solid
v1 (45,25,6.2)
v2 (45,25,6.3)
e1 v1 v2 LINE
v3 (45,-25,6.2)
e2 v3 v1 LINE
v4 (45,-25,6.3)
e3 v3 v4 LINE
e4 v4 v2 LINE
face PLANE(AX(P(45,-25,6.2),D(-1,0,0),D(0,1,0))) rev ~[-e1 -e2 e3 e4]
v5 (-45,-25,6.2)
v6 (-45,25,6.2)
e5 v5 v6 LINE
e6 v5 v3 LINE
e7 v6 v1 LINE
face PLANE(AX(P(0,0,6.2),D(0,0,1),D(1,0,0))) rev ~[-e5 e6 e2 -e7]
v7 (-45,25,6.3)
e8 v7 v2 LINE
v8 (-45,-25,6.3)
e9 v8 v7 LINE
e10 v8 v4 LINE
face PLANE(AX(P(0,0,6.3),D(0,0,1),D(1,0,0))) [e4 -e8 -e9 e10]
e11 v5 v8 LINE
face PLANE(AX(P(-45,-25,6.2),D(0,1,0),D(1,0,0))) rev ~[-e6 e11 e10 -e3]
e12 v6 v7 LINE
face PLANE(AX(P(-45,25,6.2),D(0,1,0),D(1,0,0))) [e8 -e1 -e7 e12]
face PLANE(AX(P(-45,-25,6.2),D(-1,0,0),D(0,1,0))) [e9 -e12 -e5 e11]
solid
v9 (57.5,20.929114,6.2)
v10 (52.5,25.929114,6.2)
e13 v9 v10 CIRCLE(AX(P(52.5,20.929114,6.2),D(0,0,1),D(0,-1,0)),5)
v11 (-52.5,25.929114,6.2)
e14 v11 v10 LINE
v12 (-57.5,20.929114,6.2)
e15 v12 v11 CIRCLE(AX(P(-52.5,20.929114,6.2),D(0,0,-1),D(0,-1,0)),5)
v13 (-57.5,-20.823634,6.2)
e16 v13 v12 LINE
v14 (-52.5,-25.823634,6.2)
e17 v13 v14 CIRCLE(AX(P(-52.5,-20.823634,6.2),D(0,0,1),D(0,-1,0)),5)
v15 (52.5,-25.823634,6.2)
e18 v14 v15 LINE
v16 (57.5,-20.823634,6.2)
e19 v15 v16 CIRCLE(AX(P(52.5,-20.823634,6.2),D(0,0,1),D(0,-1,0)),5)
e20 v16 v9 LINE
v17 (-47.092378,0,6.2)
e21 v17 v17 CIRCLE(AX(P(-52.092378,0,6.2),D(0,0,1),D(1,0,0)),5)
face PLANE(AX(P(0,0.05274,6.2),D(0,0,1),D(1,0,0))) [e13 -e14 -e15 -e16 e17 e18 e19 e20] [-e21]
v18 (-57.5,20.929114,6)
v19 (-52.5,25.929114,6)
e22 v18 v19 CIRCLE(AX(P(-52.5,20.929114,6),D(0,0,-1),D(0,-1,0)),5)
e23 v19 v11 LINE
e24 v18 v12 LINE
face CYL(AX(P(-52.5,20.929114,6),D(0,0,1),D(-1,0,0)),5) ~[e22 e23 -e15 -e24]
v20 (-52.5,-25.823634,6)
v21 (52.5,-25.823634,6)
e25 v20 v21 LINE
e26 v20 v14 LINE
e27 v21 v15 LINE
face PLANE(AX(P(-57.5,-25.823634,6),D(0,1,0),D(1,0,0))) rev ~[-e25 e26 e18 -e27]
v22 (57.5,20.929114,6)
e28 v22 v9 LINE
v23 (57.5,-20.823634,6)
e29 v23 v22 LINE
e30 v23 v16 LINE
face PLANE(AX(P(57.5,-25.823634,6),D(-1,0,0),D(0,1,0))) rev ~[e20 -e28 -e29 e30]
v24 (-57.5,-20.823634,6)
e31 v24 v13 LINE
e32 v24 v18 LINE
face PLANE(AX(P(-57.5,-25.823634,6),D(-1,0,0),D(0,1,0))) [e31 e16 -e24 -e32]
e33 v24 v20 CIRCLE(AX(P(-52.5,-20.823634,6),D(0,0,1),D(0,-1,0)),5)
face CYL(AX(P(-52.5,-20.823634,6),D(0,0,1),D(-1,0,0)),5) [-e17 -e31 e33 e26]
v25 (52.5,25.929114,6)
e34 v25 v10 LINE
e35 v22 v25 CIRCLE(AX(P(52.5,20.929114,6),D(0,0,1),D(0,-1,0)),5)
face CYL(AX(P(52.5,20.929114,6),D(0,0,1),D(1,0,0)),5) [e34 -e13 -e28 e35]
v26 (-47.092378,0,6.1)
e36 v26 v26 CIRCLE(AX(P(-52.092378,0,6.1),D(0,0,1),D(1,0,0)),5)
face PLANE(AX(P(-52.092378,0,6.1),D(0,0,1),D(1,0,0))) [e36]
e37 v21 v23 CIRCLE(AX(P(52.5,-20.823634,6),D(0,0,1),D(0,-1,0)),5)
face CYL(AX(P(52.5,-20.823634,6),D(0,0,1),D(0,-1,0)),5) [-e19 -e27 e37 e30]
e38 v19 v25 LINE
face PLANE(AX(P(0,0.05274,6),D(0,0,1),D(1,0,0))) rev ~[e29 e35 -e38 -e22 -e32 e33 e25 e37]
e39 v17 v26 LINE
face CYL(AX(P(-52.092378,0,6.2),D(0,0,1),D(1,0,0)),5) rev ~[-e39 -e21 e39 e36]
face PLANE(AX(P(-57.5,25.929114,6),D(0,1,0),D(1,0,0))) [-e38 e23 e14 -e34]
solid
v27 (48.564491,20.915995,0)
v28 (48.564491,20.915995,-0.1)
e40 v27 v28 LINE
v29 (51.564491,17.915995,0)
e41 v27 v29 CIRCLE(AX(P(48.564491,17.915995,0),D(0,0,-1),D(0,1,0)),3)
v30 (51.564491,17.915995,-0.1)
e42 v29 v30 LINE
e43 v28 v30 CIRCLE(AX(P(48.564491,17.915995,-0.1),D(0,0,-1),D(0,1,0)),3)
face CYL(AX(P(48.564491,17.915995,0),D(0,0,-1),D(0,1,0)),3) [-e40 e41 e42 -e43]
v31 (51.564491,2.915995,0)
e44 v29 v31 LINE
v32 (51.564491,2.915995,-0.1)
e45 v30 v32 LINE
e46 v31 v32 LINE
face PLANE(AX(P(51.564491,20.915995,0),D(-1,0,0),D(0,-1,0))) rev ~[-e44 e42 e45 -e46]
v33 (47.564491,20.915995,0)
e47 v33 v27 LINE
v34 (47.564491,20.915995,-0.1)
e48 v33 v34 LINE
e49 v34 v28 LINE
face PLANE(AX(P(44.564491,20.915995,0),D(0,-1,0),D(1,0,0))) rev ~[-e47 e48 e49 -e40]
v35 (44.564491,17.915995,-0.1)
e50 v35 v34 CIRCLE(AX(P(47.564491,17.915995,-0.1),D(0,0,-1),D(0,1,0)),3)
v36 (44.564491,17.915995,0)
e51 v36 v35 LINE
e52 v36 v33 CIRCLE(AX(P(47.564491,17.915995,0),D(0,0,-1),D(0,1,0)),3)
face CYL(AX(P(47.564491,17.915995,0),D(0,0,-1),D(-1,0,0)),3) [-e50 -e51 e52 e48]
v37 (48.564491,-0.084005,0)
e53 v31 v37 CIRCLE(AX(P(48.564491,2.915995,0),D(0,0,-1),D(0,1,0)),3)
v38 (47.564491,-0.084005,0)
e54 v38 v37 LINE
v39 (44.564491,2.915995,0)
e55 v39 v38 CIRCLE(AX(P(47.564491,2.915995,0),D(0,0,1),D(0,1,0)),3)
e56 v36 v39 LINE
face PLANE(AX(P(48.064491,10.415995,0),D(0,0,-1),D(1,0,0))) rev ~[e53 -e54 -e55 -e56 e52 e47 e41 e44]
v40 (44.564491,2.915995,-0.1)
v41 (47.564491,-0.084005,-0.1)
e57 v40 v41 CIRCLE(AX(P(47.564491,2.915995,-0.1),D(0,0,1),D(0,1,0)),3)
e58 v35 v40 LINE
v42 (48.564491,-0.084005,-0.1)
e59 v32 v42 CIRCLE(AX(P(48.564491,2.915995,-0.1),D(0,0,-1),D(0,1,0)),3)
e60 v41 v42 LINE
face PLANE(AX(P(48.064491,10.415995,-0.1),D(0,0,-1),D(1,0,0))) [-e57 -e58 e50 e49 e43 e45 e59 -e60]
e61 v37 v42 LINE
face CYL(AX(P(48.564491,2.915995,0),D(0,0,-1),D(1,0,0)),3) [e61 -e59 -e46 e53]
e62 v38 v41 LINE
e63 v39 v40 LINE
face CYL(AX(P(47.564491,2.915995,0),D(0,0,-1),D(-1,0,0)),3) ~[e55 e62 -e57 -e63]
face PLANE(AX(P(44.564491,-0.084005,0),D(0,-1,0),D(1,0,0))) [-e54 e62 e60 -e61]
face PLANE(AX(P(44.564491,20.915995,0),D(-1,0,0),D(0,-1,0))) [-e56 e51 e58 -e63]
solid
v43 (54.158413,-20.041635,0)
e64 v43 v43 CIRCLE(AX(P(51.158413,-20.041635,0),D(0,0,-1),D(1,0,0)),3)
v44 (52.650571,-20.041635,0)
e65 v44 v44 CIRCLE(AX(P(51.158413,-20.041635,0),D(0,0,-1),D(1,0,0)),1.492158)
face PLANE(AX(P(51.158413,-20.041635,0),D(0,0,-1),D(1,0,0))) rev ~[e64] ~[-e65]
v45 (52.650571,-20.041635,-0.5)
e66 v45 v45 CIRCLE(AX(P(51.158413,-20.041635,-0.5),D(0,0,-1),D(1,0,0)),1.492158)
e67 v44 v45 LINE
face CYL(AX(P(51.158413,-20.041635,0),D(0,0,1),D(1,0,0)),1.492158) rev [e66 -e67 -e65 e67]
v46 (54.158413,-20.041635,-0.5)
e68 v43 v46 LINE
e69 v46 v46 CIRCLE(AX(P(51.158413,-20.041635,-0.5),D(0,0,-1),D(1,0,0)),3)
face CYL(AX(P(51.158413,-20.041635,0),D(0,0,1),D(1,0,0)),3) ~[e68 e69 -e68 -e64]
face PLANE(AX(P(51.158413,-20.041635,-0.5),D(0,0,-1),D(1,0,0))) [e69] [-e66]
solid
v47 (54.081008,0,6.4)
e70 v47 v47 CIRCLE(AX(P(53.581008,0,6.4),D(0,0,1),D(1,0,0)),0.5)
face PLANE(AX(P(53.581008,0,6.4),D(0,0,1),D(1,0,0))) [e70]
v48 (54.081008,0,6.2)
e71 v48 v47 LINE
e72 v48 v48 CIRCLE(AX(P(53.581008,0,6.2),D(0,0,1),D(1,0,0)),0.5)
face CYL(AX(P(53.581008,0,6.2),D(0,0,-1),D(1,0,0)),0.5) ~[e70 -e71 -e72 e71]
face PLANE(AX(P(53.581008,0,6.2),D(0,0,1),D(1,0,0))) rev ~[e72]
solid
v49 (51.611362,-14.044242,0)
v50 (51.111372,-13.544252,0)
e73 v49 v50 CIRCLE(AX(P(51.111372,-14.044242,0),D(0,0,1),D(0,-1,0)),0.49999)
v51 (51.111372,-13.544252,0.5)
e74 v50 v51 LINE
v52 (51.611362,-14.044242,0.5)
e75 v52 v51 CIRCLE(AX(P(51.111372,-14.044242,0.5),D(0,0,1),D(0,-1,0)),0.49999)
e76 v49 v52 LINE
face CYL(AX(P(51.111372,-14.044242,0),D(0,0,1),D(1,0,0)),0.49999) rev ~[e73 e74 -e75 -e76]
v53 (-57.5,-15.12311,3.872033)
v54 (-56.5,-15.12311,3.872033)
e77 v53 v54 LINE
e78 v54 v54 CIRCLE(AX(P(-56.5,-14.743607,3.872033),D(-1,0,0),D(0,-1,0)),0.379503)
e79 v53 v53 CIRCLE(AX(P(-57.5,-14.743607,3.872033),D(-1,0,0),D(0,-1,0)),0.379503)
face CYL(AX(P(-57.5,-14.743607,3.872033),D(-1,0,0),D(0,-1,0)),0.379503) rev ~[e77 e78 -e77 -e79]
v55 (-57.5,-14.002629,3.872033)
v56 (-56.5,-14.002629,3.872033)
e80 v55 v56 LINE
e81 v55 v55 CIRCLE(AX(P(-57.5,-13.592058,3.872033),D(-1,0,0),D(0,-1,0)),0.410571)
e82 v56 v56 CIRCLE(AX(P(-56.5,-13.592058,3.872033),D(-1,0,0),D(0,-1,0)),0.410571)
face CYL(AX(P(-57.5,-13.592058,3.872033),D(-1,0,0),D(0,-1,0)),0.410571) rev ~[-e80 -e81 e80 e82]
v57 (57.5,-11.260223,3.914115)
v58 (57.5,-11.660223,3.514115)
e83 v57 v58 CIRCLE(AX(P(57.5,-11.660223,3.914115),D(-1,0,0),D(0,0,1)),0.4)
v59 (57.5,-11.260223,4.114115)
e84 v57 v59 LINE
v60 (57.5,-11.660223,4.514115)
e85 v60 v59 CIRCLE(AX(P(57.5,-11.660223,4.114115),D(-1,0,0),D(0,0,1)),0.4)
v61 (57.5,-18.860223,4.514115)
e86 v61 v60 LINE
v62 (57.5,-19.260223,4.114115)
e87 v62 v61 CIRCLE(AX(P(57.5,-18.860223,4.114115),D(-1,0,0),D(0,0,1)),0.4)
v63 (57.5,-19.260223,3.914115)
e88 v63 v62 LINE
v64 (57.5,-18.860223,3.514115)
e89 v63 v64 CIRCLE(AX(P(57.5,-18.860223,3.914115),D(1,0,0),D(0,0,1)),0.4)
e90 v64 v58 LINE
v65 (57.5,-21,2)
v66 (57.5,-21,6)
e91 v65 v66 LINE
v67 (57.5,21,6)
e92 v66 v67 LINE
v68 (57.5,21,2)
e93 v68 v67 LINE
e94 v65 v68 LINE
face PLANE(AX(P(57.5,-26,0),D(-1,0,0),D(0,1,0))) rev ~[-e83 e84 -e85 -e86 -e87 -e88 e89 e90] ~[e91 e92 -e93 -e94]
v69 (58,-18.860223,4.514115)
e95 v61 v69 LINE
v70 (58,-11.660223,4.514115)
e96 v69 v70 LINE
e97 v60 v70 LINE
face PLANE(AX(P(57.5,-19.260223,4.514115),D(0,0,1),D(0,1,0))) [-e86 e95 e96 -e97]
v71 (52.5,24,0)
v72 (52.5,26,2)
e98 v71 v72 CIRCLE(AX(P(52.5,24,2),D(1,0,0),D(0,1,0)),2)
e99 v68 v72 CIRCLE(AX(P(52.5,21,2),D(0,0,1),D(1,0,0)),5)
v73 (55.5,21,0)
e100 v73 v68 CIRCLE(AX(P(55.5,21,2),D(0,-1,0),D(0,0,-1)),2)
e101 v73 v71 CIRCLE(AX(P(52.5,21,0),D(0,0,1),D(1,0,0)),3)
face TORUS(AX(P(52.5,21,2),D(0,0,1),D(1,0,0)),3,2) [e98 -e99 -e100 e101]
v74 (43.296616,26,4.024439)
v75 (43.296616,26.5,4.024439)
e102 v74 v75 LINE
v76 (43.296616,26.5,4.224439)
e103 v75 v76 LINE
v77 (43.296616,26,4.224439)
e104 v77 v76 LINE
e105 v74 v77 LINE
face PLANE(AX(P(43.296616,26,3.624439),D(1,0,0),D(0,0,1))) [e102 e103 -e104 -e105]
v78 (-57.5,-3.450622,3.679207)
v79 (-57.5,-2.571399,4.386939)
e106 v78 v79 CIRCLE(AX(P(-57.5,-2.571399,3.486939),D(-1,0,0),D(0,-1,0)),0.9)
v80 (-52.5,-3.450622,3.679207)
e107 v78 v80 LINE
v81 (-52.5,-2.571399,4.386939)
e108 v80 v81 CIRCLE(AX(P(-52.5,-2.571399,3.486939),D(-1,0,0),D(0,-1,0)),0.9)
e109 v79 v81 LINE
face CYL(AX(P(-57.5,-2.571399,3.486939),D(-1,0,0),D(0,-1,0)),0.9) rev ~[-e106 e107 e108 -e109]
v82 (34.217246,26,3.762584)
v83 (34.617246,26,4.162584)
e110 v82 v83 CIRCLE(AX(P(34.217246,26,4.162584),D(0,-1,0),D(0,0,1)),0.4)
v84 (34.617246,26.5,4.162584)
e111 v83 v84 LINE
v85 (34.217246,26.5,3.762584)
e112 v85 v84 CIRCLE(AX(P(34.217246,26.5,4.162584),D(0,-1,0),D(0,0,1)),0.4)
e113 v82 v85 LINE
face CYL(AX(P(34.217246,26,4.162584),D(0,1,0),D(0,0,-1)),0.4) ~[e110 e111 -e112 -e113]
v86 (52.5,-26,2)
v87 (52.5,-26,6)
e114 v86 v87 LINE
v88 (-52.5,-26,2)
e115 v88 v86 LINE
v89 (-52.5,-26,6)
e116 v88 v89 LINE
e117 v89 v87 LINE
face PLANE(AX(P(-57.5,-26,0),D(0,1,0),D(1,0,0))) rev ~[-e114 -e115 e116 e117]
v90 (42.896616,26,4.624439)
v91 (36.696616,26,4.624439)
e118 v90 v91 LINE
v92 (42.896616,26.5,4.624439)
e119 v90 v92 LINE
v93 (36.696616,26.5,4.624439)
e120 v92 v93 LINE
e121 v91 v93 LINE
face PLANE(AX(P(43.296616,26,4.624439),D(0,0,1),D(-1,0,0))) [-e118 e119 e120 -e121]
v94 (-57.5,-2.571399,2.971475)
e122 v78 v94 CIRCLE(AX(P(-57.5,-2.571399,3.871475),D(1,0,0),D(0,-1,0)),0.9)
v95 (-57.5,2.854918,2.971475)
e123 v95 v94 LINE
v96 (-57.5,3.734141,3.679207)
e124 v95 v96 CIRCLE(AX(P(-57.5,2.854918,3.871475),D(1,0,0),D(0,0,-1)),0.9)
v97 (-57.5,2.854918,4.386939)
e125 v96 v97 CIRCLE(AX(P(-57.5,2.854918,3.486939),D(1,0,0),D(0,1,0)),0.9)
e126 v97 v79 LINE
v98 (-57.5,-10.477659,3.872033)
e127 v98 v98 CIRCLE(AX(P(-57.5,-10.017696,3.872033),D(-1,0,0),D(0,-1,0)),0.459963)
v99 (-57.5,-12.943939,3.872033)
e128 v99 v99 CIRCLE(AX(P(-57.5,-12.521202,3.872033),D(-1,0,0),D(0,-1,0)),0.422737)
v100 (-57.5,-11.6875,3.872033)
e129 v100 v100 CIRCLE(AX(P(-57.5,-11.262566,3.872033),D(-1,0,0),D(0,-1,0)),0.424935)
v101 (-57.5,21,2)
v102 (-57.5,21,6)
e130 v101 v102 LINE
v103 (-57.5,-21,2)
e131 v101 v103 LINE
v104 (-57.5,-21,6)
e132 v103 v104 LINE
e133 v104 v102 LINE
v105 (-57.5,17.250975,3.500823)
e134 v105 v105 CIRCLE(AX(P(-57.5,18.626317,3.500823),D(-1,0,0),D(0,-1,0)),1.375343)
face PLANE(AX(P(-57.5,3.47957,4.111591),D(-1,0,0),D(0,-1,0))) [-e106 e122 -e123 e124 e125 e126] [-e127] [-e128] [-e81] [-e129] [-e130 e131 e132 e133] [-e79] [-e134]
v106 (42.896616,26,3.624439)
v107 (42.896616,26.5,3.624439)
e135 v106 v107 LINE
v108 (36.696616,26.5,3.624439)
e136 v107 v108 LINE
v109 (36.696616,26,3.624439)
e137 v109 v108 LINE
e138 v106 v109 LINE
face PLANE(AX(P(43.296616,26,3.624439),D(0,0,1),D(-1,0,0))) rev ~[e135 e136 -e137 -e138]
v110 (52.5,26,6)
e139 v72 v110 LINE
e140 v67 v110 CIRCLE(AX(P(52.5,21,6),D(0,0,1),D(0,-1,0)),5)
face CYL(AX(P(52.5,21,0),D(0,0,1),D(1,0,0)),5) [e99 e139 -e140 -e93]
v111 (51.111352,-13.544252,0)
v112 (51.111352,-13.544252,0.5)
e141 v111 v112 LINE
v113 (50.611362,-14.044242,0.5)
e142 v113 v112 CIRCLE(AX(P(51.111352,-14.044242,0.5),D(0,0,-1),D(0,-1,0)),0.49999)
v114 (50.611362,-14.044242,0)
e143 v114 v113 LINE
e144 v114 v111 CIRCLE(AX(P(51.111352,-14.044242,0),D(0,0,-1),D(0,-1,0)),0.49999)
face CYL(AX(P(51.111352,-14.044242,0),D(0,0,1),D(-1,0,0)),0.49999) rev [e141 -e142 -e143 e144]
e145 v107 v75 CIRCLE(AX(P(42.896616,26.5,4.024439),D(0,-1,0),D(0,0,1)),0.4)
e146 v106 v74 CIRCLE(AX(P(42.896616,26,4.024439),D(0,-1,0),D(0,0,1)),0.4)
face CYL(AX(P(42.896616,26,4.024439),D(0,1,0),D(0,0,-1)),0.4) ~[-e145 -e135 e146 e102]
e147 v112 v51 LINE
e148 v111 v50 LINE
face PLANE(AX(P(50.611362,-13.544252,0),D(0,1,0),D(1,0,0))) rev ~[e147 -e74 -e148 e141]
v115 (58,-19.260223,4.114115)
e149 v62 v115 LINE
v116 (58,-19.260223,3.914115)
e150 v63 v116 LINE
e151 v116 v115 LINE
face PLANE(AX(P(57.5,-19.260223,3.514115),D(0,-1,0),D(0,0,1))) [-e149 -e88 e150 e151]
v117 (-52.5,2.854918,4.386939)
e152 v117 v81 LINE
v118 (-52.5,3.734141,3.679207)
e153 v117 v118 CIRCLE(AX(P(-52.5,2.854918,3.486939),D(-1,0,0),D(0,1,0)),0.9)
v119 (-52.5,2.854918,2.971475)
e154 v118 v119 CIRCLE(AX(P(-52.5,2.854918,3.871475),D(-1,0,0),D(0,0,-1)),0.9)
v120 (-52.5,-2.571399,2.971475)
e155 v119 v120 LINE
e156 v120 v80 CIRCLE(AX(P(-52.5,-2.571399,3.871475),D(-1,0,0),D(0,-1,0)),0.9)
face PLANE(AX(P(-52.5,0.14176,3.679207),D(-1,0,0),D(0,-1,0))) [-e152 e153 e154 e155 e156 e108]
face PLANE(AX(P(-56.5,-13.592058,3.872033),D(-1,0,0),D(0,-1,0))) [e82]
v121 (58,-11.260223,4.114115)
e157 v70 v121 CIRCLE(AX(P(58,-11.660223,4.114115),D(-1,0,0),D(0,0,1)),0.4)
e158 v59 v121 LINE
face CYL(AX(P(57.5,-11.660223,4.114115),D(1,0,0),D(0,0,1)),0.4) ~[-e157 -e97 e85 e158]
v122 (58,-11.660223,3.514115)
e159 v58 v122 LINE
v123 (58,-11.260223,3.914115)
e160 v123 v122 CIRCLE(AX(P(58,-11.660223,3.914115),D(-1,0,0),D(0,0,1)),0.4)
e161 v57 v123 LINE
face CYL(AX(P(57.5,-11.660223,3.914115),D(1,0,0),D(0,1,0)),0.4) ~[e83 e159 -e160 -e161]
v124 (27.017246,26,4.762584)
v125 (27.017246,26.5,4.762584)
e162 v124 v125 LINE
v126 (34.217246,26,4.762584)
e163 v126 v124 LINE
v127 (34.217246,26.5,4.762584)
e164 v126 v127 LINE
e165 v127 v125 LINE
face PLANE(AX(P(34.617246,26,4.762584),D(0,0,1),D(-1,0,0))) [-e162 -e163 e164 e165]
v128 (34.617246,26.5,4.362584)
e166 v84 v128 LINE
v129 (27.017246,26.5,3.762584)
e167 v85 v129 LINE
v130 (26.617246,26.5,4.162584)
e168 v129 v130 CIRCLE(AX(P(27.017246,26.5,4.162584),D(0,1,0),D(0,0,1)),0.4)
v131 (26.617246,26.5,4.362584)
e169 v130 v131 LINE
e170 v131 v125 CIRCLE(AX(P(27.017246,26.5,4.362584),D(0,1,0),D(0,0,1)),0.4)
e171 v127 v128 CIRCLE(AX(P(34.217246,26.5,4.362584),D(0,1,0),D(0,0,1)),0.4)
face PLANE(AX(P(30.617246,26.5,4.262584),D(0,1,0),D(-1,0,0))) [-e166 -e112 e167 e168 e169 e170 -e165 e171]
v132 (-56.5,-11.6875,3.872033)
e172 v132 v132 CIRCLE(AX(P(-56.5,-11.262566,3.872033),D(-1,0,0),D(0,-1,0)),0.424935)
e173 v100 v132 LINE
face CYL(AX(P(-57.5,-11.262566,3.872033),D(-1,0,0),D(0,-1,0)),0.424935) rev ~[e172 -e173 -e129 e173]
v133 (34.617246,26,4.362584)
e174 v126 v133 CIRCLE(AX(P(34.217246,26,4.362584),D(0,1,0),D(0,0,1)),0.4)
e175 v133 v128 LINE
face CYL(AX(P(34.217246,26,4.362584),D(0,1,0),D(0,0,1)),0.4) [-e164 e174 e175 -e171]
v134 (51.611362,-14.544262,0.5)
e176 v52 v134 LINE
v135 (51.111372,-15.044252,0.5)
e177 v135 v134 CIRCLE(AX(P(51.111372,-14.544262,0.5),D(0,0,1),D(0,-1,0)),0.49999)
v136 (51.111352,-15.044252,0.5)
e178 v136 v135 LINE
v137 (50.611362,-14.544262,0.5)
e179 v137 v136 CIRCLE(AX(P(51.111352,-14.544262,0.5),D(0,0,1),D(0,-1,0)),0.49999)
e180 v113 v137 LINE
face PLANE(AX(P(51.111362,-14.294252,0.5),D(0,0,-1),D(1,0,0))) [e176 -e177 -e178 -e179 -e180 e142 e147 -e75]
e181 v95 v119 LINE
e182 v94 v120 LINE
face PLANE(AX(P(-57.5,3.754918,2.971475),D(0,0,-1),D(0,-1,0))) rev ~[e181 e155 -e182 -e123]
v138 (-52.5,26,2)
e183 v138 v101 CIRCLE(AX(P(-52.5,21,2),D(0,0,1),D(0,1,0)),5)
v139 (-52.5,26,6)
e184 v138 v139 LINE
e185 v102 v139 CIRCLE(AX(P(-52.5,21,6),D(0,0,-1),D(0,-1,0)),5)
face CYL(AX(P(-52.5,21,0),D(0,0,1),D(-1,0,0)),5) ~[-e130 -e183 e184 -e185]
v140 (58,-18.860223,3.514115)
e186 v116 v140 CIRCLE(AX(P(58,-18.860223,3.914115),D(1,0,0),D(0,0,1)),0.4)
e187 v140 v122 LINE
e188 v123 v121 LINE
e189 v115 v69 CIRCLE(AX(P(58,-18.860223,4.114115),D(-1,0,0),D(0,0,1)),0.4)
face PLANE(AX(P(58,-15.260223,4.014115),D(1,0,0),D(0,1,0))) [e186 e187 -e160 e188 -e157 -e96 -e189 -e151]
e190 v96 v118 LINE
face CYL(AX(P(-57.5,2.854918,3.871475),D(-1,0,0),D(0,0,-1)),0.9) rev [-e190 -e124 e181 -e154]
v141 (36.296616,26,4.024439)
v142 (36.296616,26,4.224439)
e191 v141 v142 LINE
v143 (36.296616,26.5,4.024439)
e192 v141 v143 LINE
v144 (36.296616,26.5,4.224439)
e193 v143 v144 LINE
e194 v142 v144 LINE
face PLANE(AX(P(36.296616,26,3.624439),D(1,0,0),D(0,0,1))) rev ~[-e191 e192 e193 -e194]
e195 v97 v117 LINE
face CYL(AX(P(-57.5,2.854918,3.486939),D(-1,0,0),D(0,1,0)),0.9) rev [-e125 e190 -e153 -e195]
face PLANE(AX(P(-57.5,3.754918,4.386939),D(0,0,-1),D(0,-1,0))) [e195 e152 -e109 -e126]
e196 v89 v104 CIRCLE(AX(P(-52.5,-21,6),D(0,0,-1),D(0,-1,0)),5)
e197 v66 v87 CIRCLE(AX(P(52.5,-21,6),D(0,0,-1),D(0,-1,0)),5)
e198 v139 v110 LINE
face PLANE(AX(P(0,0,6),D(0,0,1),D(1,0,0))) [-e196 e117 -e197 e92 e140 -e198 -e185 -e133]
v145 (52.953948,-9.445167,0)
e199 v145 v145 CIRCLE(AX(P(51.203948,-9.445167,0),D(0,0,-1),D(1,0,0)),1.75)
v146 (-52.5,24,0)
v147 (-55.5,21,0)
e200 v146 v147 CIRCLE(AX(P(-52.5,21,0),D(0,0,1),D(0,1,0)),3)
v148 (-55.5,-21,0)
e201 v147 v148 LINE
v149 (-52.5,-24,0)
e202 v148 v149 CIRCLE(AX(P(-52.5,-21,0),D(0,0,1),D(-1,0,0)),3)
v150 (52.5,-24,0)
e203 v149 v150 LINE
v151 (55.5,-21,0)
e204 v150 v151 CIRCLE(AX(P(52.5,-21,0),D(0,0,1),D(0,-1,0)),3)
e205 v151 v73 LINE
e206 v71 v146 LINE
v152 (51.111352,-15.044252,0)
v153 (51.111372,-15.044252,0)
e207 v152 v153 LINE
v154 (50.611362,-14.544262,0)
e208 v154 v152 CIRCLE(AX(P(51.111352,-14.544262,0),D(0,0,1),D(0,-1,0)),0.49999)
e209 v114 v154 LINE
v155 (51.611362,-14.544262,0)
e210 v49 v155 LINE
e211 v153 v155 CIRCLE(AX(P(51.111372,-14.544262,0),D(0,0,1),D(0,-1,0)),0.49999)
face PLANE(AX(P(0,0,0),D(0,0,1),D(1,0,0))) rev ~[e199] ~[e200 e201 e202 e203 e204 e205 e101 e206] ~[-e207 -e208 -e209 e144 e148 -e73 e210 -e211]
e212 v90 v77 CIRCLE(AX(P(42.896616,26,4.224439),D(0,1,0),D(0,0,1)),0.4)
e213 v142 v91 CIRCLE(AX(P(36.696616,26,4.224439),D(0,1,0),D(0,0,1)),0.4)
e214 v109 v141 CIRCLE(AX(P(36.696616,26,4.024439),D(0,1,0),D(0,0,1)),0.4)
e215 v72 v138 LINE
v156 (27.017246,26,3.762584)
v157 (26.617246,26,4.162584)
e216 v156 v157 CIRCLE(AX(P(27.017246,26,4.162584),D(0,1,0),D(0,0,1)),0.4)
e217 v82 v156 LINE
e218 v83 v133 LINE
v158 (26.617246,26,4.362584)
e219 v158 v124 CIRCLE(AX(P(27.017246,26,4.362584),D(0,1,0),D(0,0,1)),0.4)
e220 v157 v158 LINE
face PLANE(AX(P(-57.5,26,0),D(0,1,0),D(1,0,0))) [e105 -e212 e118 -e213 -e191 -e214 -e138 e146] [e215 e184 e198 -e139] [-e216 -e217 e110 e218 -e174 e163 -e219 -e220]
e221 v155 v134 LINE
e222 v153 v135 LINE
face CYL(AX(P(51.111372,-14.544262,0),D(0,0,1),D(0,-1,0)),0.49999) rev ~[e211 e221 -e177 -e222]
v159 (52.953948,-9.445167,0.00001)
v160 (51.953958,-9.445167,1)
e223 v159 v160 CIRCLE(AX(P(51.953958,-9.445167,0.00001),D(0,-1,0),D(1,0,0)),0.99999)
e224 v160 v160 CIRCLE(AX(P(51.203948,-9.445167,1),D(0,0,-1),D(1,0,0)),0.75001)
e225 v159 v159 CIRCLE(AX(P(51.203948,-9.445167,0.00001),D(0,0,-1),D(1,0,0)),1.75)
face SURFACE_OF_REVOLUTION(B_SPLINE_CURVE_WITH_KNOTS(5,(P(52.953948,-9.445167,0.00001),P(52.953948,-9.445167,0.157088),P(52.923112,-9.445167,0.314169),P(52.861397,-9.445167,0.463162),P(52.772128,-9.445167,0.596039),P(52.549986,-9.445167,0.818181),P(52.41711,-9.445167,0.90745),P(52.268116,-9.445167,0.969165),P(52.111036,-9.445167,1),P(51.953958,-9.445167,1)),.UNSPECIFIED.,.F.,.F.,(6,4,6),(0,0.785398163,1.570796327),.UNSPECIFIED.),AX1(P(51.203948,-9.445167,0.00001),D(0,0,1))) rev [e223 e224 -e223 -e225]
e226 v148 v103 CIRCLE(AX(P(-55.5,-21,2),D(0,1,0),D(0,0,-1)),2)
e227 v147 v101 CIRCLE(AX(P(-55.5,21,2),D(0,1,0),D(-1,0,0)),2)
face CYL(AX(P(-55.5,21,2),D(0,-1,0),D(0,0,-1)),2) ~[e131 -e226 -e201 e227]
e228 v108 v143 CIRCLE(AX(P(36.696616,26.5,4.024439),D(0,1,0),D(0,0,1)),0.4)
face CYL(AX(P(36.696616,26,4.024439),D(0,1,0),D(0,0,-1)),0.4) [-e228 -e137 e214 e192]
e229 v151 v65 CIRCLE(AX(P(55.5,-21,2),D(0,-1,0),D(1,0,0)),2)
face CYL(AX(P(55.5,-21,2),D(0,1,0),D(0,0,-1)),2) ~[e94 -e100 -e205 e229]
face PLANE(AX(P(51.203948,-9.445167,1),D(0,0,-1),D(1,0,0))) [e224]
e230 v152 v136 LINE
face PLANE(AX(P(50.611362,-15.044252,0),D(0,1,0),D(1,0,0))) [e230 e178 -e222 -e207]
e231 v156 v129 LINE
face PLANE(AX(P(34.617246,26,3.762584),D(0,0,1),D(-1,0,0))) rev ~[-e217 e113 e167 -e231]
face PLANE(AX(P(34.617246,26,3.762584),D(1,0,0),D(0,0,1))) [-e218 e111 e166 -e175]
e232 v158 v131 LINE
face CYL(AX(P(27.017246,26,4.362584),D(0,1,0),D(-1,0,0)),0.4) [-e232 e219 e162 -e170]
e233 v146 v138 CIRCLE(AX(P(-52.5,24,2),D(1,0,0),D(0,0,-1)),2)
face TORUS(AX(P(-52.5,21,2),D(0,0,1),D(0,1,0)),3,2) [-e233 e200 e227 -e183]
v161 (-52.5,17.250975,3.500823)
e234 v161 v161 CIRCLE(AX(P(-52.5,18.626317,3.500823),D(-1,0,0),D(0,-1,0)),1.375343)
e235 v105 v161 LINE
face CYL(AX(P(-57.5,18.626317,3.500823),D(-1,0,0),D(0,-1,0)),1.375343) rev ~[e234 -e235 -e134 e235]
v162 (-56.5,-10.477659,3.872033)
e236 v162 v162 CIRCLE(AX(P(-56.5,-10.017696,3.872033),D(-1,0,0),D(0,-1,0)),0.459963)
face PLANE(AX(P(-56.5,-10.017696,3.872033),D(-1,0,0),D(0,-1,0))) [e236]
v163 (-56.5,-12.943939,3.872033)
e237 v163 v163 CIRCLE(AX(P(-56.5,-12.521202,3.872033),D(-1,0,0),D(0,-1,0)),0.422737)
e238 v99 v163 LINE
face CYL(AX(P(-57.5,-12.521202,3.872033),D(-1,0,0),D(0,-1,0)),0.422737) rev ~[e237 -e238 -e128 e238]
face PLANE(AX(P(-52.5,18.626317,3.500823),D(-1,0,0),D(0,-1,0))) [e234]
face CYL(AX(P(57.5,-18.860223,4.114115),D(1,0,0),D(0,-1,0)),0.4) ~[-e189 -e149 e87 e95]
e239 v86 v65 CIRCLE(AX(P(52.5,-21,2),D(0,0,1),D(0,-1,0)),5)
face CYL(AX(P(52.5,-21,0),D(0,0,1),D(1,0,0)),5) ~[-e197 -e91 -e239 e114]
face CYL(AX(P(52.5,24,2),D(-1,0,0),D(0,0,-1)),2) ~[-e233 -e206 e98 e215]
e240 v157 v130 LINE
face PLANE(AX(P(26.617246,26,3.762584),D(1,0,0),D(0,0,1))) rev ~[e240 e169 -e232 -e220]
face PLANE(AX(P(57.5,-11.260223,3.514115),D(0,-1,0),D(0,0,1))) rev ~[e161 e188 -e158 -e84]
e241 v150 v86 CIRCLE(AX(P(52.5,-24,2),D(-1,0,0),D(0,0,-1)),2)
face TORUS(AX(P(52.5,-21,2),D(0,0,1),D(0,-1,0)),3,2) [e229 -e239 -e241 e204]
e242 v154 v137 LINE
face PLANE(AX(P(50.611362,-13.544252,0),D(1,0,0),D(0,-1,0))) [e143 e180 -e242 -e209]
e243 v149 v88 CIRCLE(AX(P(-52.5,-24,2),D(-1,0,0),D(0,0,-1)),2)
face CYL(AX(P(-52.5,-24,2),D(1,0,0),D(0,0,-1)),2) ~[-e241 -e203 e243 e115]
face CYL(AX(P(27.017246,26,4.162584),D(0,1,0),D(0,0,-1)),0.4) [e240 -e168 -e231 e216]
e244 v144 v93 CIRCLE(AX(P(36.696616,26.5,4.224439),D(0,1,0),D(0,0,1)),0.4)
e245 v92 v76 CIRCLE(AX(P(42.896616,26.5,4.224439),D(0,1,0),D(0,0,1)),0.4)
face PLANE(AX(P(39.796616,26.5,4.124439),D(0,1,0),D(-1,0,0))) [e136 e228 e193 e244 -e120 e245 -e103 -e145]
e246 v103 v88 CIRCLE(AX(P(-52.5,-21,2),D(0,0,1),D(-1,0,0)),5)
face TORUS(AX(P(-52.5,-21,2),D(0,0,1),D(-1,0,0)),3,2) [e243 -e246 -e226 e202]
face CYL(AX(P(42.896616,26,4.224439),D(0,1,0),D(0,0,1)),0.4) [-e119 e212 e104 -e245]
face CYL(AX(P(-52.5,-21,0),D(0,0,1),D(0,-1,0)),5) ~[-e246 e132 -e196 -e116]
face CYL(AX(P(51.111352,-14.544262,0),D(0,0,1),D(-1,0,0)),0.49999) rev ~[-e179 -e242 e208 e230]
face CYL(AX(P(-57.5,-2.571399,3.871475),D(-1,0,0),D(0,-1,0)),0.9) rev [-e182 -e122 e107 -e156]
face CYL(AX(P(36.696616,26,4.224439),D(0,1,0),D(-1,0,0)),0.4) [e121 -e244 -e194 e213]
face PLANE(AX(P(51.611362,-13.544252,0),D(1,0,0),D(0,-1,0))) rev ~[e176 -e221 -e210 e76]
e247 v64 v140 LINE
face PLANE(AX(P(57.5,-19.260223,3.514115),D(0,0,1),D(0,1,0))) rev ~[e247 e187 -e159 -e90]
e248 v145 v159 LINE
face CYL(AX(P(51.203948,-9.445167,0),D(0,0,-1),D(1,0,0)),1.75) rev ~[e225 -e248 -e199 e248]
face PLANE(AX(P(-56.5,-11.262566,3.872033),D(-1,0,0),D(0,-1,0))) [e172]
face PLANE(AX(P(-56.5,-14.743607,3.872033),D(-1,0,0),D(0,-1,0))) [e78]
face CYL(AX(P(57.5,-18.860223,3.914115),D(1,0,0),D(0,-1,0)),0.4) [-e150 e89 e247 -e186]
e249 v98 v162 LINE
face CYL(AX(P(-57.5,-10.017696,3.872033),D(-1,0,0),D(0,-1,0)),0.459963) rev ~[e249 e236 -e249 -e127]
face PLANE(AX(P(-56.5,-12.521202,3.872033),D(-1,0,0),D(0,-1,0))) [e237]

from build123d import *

# Parameters (mm, degrees)
F0_W         = 115
F0_H         = 52
F1_DEPTH     = 6
F2_R         = 5
F3_R         = 5
F4_R         = 5
F5_R         = 5
F6_R         = 2
F7_W         = 7
F7_H         = 1
F8_DEPTH     = 0.5
F9_R         = 0.4
F10_W        = 8
F10_H        = 1
F11_DEPTH    = 0.5
F12_R        = 0.4
F13_R        = 1.3753427914
F14_DEPTH    = 5
F15_W        = 7.2263174225
F15_H        = 1.4154640958
F16_DEPTH    = 5
F17_T1_DEPTH = 7.25
F18_R        = 0.4599630822
F18_R_2      = 0.4249345938
F18_R_3      = 0.4227374369
F18_R_4      = 0.410570945
F18_R_5      = 0.3795025996
F19_DEPTH    = 1
F20_W        = 8
F20_H        = 1
F21_DEPTH    = 0.5
F22_R        = 0.4
F23_R        = 3
F23_R_2      = 1.4921578392
F24_DEPTH    = 0.5
F25_W        = 1
F25_H        = 1.5
F26_DEPTH    = 0.5
F27_R        = 0.49999
F28_R        = 1.75
F29_DEPTH    = 1
F30_R        = 0.99999
F31_W        = 7
F31_H        = 21
F32_DEPTH    = 0.1
F33_R        = 3
F34_W        = 115
F34_H        = 51.7527479678
F35_DEPTH    = 0.2
F36_R        = 5
F38_R        = 0.5
F39_DEPTH    = 0.2
F40_W        = 90
F40_H        = 50
F41_DEPTH    = 0.1
F42_R        = 5
F43_DEPTH    = 0.1


# Not quite as in the source:
# - a fillet or chamfer that OpenCascade refuses, or shapes differently, is made with other operations: its cross-section is extruded or revolved along the edge and cut away or added
# - a fillet or chamfer is up to 0.001 mm smaller than in the source, because OpenCascade refuses the exact size


with BuildPart() as f1:
    # F0 (on Top) → F1 (new body)
    with BuildSketch(Plane.XY):
        Rectangle(F0_W, F0_H)
    extrude(amount=F1_DEPTH)

    # F2
    f2_edges = [f1.edges().sort_by_distance(p)[0] for p in [
        (57.5, 26, 3),
    ]]
    fillet(f2_edges, radius=F2_R)

    # F3
    f3_edges = [f1.edges().sort_by_distance(p)[0] for p in [
        (57.5, -26, 3),
    ]]
    fillet(f3_edges, radius=F3_R)

    # F4
    f4_edges = [f1.edges().sort_by_distance(p)[0] for p in [
        (-57.5, -26, 3),
    ]]
    fillet(f4_edges, radius=F4_R)

    # F5
    f5_edges = [f1.edges().sort_by_distance(p)[0] for p in [
        (-57.5, 26, 3),
    ]]
    fillet(f5_edges, radius=F5_R)

    # F6
    f6_edges = [f1.edges().sort_by_distance(p)[0] for p in [
        (0, -26, 0),
    ]]
    fillet(f6_edges, radius=F6_R)

    # F7 (on face) → F8 (join)
    with BuildSketch(Plane(origin=(0, 26, 0), x_dir=(-1, 0, 0), z_dir=(0, 1, 0))):
        with Locations((-39.7966161668, 4.1244386885)):
            Rectangle(F7_W, F7_H)
    extrude(amount=F8_DEPTH)

    # F9
    f9_edges = [f1.edges().sort_by_distance(p)[0] for p in [
        (43.296616, 26.25, 4.624439),
        (43.296616, 26.25, 3.624439),
        (36.296616, 26.25, 3.624439),
        (36.296616, 26.25, 4.624439),
    ]]
    fillet(f9_edges, radius=F9_R)

    # F10 (on face) → F11 (join)
    with BuildSketch(Plane(origin=(0, 26, 0), x_dir=(-1, 0, 0), z_dir=(0, 1, 0))):
        with Locations((-30.6172464043, 4.2625843126)):
            Rectangle(F10_W, F10_H)
    extrude(amount=F11_DEPTH)

    # F12
    f12_edges = [f1.edges().sort_by_distance(p)[0] for p in [
        (34.617246, 26.25, 4.762584),
        (34.617246, 26.25, 3.762584),
        (26.617246, 26.25, 3.762584),
        (26.617246, 26.25, 4.762584),
    ]]
    fillet(f12_edges, radius=F12_R)

    # F13 (on face) → F14 (cut)
    with BuildSketch(Plane(origin=(-57.5, 0, 0), x_dir=(0, -1, 0), z_dir=(-1, 0, 0))):
        with Locations((-18.6263173819, 3.5008231644)):
            Circle(F13_R)
    extrude(amount=-F14_DEPTH, mode=Mode.SUBTRACT)

    # F15 (on face) → F16 (cut)
    with BuildSketch(Plane(origin=(-57.5, 0, 0), x_dir=(0, -1, 0), z_dir=(-1, 0, 0))):
        with Locations((-0.1417595195, 3.6792070605)):
            Rectangle(F15_W, F15_H)
    extrude(amount=-F16_DEPTH, mode=Mode.SUBTRACT)

    # F17: fillet of radius 0.9 on 4 edges, made by hand

    # F17_s2 → F17_t1 (join)
    with BuildSketch(Plane.YZ.offset(-57.5)):
        with BuildLine():
            ThreePointArc((3.7549182307, 3.4869391084), (3.4913143338, 4.1233352114), (2.8549182307, 4.3869391084))
            Line((2.8549182307, 4.3869391084), (3.7549182307, 4.3869391084))
            Line((3.7549182307, 4.3869391084), (3.7549182307, 3.4869391084))
        make_face()
        with BuildLine():
            ThreePointArc((2.8549182307, 2.9714750126), (3.4913143338, 3.2350789095), (3.7549182307, 3.8714750126))
            Line((3.7549182307, 3.8714750126), (3.7549182307, 2.9714750126))
            Line((3.7549182307, 2.9714750126), (2.8549182307, 2.9714750126))
        make_face()
        with BuildLine():
            ThreePointArc((-3.4713991918, 3.4869391084), (-3.2077952948, 4.1233352114), (-2.5713991918, 4.3869391084))
            Line((-2.5713991918, 4.3869391084), (-3.4713991918, 4.3869391084))
            Line((-3.4713991918, 4.3869391084), (-3.4713991918, 3.4869391084))
        make_face()
        with BuildLine():
            ThreePointArc((-3.4713991918, 3.8714750126), (-3.2077952948, 3.2350789095), (-2.5713991918, 2.9714750126))
            Line((-2.5713991918, 2.9714750126), (-3.4713991918, 2.9714750126))
            Line((-3.4713991918, 2.9714750126), (-3.4713991918, 3.8714750126))
        make_face()
    extrude(amount=F17_T1_DEPTH)

    # F18 (on face) → F19 (cut)
    with BuildSketch(Plane(origin=(-57.5, 0, 0), x_dir=(0, -1, 0), z_dir=(-1, 0, 0))):
        with Locations((10.0176958367, 3.8720327429)):
            Circle(F18_R)
        with Locations((11.2625658512, 3.8720327429)):
            Circle(F18_R_2)
        with Locations((12.5212017447, 3.8720327429)):
            Circle(F18_R_3)
        with Locations((13.5920578614, 3.8720327429)):
            Circle(F18_R_4)
        with Locations((14.7436074913, 3.8720327429)):
            Circle(F18_R_5)
    extrude(amount=-F19_DEPTH, mode=Mode.SUBTRACT)

    # F20 (on face) → F21 (join)
    with BuildSketch(Plane.YZ.offset(57.5)):
        with Locations((-15.2602228336, 4.0141151957)):
            Rectangle(F20_W, F20_H)
    extrude(amount=F21_DEPTH)

    # F22
    f22_edges = [f1.edges().sort_by_distance(p)[0] for p in [
        (57.75, -19.260223, 4.514115),
        (57.75, -19.260223, 3.514115),
        (57.75, -11.260223, 4.514115),
        (57.75, -11.260223, 3.514115),
    ]]
    fillet(f22_edges, radius=F22_R)

    # F25 (on face) → F26 (cut)
    with BuildSketch(Plane(origin=(0, 0, 0), x_dir=(1, 0, 0), z_dir=(0, 0, -1))):
        with Locations((51.1113621431, 14.2942524761)):
            Rectangle(F25_W, F25_H)
    extrude(amount=-F26_DEPTH, mode=Mode.SUBTRACT)

    # F27 (radius 0.5 in the source; OpenCascade refuses exactly that, so slightly less here)
    f27_edges = [f1.edges().sort_by_distance(p)[0] for p in [
        (50.611362, -13.544252, 0.25),
        (50.611362, -15.044252, 0.25),
        (51.611362, -15.044252, 0.25),
        (51.611362, -13.544252, 0.25),
    ]]
    fillet(f27_edges, radius=F27_R)

    # F28 (on face) → F29 (cut)
    with BuildSketch(Plane(origin=(0, 0, 0), x_dir=(1, 0, 0), z_dir=(0, 0, -1))):
        with Locations((51.2039475143, 9.4451671466)):
            Circle(F28_R)
    extrude(amount=-F29_DEPTH, mode=Mode.SUBTRACT)

    # F30 (radius 1 in the source; OpenCascade refuses exactly that, so slightly less here)
    f30_edges = [f1.edges().sort_by_distance(p)[0] for p in [
        (49.453948, -9.445167, 1),
    ]]
    fillet(f30_edges, radius=F30_R)


with BuildPart() as f24:
    # F23 (on face) → F24 (new body)
    with BuildSketch(Plane(origin=(0, 0, 0), x_dir=(1, 0, 0), z_dir=(0, 0, -1))):
        with Locations((51.158413291, 20.04163526)):
            Circle(F23_R)
        with Locations((51.158413291, 20.04163526)):
            Circle(F23_R_2, mode=Mode.SUBTRACT)
    extrude(amount=F24_DEPTH)


with BuildPart() as f32:
    # F31 (on face) → F32 (new body)
    with BuildSketch(Plane(origin=(0, 0, 0), x_dir=(1, 0, 0), z_dir=(0, 0, -1))):
        with Locations((48.0644905215, -10.4159945622)):
            Rectangle(F31_W, F31_H)
    extrude(amount=F32_DEPTH)

    # F33
    f33_edges = [f32.edges().sort_by_distance(p)[0] for p in [
        (51.564491, 20.915995, -0.05),
        (44.564491, 20.915995, -0.05),
        (51.564491, -0.084005, -0.05),
        (44.564491, -0.084005, -0.05),
    ]]
    fillet(f33_edges, radius=F33_R)


with BuildPart() as f35:
    # F34 (on face) → F35 (new body)
    with BuildSketch(Plane.XY.offset(6)):
        with Locations((0, 0.0527398661)):
            Rectangle(F34_W, F34_H)
    extrude(amount=F35_DEPTH)

    # F36
    f36_edges = [f35.edges().sort_by_distance(p)[0] for p in [
        (-57.5, 25.929114, 6.1),
        (57.5, 25.929114, 6.1),
        (57.5, -25.823634, 6.1),
        (-57.5, -25.823634, 6.1),
    ]]
    fillet(f36_edges, radius=F36_R)

    # F42 (on face) → F43 (cut)
    with BuildSketch(Plane.XY.offset(6.2)):
        with Locations((-52.0923775704, 0)):
            Circle(F42_R)
    extrude(amount=-F43_DEPTH, mode=Mode.SUBTRACT)


with BuildPart() as f39:
    # F38 (on face) → F39 (new body)
    with BuildSketch(Plane.XY.offset(6.2)):
        with Locations((53.5810078753, 0)):
            Circle(F38_R)
    extrude(amount=F39_DEPTH)


with BuildPart() as f41:
    # F40 (on face) → F41 (new body)
    with BuildSketch(Plane.XY.offset(6.2)):
        Rectangle(F40_W, F40_H)
    extrude(amount=F41_DEPTH)


solid = Compound([f1.part, f24.part, f32.part, f35.part, f39.part, f41.part])
